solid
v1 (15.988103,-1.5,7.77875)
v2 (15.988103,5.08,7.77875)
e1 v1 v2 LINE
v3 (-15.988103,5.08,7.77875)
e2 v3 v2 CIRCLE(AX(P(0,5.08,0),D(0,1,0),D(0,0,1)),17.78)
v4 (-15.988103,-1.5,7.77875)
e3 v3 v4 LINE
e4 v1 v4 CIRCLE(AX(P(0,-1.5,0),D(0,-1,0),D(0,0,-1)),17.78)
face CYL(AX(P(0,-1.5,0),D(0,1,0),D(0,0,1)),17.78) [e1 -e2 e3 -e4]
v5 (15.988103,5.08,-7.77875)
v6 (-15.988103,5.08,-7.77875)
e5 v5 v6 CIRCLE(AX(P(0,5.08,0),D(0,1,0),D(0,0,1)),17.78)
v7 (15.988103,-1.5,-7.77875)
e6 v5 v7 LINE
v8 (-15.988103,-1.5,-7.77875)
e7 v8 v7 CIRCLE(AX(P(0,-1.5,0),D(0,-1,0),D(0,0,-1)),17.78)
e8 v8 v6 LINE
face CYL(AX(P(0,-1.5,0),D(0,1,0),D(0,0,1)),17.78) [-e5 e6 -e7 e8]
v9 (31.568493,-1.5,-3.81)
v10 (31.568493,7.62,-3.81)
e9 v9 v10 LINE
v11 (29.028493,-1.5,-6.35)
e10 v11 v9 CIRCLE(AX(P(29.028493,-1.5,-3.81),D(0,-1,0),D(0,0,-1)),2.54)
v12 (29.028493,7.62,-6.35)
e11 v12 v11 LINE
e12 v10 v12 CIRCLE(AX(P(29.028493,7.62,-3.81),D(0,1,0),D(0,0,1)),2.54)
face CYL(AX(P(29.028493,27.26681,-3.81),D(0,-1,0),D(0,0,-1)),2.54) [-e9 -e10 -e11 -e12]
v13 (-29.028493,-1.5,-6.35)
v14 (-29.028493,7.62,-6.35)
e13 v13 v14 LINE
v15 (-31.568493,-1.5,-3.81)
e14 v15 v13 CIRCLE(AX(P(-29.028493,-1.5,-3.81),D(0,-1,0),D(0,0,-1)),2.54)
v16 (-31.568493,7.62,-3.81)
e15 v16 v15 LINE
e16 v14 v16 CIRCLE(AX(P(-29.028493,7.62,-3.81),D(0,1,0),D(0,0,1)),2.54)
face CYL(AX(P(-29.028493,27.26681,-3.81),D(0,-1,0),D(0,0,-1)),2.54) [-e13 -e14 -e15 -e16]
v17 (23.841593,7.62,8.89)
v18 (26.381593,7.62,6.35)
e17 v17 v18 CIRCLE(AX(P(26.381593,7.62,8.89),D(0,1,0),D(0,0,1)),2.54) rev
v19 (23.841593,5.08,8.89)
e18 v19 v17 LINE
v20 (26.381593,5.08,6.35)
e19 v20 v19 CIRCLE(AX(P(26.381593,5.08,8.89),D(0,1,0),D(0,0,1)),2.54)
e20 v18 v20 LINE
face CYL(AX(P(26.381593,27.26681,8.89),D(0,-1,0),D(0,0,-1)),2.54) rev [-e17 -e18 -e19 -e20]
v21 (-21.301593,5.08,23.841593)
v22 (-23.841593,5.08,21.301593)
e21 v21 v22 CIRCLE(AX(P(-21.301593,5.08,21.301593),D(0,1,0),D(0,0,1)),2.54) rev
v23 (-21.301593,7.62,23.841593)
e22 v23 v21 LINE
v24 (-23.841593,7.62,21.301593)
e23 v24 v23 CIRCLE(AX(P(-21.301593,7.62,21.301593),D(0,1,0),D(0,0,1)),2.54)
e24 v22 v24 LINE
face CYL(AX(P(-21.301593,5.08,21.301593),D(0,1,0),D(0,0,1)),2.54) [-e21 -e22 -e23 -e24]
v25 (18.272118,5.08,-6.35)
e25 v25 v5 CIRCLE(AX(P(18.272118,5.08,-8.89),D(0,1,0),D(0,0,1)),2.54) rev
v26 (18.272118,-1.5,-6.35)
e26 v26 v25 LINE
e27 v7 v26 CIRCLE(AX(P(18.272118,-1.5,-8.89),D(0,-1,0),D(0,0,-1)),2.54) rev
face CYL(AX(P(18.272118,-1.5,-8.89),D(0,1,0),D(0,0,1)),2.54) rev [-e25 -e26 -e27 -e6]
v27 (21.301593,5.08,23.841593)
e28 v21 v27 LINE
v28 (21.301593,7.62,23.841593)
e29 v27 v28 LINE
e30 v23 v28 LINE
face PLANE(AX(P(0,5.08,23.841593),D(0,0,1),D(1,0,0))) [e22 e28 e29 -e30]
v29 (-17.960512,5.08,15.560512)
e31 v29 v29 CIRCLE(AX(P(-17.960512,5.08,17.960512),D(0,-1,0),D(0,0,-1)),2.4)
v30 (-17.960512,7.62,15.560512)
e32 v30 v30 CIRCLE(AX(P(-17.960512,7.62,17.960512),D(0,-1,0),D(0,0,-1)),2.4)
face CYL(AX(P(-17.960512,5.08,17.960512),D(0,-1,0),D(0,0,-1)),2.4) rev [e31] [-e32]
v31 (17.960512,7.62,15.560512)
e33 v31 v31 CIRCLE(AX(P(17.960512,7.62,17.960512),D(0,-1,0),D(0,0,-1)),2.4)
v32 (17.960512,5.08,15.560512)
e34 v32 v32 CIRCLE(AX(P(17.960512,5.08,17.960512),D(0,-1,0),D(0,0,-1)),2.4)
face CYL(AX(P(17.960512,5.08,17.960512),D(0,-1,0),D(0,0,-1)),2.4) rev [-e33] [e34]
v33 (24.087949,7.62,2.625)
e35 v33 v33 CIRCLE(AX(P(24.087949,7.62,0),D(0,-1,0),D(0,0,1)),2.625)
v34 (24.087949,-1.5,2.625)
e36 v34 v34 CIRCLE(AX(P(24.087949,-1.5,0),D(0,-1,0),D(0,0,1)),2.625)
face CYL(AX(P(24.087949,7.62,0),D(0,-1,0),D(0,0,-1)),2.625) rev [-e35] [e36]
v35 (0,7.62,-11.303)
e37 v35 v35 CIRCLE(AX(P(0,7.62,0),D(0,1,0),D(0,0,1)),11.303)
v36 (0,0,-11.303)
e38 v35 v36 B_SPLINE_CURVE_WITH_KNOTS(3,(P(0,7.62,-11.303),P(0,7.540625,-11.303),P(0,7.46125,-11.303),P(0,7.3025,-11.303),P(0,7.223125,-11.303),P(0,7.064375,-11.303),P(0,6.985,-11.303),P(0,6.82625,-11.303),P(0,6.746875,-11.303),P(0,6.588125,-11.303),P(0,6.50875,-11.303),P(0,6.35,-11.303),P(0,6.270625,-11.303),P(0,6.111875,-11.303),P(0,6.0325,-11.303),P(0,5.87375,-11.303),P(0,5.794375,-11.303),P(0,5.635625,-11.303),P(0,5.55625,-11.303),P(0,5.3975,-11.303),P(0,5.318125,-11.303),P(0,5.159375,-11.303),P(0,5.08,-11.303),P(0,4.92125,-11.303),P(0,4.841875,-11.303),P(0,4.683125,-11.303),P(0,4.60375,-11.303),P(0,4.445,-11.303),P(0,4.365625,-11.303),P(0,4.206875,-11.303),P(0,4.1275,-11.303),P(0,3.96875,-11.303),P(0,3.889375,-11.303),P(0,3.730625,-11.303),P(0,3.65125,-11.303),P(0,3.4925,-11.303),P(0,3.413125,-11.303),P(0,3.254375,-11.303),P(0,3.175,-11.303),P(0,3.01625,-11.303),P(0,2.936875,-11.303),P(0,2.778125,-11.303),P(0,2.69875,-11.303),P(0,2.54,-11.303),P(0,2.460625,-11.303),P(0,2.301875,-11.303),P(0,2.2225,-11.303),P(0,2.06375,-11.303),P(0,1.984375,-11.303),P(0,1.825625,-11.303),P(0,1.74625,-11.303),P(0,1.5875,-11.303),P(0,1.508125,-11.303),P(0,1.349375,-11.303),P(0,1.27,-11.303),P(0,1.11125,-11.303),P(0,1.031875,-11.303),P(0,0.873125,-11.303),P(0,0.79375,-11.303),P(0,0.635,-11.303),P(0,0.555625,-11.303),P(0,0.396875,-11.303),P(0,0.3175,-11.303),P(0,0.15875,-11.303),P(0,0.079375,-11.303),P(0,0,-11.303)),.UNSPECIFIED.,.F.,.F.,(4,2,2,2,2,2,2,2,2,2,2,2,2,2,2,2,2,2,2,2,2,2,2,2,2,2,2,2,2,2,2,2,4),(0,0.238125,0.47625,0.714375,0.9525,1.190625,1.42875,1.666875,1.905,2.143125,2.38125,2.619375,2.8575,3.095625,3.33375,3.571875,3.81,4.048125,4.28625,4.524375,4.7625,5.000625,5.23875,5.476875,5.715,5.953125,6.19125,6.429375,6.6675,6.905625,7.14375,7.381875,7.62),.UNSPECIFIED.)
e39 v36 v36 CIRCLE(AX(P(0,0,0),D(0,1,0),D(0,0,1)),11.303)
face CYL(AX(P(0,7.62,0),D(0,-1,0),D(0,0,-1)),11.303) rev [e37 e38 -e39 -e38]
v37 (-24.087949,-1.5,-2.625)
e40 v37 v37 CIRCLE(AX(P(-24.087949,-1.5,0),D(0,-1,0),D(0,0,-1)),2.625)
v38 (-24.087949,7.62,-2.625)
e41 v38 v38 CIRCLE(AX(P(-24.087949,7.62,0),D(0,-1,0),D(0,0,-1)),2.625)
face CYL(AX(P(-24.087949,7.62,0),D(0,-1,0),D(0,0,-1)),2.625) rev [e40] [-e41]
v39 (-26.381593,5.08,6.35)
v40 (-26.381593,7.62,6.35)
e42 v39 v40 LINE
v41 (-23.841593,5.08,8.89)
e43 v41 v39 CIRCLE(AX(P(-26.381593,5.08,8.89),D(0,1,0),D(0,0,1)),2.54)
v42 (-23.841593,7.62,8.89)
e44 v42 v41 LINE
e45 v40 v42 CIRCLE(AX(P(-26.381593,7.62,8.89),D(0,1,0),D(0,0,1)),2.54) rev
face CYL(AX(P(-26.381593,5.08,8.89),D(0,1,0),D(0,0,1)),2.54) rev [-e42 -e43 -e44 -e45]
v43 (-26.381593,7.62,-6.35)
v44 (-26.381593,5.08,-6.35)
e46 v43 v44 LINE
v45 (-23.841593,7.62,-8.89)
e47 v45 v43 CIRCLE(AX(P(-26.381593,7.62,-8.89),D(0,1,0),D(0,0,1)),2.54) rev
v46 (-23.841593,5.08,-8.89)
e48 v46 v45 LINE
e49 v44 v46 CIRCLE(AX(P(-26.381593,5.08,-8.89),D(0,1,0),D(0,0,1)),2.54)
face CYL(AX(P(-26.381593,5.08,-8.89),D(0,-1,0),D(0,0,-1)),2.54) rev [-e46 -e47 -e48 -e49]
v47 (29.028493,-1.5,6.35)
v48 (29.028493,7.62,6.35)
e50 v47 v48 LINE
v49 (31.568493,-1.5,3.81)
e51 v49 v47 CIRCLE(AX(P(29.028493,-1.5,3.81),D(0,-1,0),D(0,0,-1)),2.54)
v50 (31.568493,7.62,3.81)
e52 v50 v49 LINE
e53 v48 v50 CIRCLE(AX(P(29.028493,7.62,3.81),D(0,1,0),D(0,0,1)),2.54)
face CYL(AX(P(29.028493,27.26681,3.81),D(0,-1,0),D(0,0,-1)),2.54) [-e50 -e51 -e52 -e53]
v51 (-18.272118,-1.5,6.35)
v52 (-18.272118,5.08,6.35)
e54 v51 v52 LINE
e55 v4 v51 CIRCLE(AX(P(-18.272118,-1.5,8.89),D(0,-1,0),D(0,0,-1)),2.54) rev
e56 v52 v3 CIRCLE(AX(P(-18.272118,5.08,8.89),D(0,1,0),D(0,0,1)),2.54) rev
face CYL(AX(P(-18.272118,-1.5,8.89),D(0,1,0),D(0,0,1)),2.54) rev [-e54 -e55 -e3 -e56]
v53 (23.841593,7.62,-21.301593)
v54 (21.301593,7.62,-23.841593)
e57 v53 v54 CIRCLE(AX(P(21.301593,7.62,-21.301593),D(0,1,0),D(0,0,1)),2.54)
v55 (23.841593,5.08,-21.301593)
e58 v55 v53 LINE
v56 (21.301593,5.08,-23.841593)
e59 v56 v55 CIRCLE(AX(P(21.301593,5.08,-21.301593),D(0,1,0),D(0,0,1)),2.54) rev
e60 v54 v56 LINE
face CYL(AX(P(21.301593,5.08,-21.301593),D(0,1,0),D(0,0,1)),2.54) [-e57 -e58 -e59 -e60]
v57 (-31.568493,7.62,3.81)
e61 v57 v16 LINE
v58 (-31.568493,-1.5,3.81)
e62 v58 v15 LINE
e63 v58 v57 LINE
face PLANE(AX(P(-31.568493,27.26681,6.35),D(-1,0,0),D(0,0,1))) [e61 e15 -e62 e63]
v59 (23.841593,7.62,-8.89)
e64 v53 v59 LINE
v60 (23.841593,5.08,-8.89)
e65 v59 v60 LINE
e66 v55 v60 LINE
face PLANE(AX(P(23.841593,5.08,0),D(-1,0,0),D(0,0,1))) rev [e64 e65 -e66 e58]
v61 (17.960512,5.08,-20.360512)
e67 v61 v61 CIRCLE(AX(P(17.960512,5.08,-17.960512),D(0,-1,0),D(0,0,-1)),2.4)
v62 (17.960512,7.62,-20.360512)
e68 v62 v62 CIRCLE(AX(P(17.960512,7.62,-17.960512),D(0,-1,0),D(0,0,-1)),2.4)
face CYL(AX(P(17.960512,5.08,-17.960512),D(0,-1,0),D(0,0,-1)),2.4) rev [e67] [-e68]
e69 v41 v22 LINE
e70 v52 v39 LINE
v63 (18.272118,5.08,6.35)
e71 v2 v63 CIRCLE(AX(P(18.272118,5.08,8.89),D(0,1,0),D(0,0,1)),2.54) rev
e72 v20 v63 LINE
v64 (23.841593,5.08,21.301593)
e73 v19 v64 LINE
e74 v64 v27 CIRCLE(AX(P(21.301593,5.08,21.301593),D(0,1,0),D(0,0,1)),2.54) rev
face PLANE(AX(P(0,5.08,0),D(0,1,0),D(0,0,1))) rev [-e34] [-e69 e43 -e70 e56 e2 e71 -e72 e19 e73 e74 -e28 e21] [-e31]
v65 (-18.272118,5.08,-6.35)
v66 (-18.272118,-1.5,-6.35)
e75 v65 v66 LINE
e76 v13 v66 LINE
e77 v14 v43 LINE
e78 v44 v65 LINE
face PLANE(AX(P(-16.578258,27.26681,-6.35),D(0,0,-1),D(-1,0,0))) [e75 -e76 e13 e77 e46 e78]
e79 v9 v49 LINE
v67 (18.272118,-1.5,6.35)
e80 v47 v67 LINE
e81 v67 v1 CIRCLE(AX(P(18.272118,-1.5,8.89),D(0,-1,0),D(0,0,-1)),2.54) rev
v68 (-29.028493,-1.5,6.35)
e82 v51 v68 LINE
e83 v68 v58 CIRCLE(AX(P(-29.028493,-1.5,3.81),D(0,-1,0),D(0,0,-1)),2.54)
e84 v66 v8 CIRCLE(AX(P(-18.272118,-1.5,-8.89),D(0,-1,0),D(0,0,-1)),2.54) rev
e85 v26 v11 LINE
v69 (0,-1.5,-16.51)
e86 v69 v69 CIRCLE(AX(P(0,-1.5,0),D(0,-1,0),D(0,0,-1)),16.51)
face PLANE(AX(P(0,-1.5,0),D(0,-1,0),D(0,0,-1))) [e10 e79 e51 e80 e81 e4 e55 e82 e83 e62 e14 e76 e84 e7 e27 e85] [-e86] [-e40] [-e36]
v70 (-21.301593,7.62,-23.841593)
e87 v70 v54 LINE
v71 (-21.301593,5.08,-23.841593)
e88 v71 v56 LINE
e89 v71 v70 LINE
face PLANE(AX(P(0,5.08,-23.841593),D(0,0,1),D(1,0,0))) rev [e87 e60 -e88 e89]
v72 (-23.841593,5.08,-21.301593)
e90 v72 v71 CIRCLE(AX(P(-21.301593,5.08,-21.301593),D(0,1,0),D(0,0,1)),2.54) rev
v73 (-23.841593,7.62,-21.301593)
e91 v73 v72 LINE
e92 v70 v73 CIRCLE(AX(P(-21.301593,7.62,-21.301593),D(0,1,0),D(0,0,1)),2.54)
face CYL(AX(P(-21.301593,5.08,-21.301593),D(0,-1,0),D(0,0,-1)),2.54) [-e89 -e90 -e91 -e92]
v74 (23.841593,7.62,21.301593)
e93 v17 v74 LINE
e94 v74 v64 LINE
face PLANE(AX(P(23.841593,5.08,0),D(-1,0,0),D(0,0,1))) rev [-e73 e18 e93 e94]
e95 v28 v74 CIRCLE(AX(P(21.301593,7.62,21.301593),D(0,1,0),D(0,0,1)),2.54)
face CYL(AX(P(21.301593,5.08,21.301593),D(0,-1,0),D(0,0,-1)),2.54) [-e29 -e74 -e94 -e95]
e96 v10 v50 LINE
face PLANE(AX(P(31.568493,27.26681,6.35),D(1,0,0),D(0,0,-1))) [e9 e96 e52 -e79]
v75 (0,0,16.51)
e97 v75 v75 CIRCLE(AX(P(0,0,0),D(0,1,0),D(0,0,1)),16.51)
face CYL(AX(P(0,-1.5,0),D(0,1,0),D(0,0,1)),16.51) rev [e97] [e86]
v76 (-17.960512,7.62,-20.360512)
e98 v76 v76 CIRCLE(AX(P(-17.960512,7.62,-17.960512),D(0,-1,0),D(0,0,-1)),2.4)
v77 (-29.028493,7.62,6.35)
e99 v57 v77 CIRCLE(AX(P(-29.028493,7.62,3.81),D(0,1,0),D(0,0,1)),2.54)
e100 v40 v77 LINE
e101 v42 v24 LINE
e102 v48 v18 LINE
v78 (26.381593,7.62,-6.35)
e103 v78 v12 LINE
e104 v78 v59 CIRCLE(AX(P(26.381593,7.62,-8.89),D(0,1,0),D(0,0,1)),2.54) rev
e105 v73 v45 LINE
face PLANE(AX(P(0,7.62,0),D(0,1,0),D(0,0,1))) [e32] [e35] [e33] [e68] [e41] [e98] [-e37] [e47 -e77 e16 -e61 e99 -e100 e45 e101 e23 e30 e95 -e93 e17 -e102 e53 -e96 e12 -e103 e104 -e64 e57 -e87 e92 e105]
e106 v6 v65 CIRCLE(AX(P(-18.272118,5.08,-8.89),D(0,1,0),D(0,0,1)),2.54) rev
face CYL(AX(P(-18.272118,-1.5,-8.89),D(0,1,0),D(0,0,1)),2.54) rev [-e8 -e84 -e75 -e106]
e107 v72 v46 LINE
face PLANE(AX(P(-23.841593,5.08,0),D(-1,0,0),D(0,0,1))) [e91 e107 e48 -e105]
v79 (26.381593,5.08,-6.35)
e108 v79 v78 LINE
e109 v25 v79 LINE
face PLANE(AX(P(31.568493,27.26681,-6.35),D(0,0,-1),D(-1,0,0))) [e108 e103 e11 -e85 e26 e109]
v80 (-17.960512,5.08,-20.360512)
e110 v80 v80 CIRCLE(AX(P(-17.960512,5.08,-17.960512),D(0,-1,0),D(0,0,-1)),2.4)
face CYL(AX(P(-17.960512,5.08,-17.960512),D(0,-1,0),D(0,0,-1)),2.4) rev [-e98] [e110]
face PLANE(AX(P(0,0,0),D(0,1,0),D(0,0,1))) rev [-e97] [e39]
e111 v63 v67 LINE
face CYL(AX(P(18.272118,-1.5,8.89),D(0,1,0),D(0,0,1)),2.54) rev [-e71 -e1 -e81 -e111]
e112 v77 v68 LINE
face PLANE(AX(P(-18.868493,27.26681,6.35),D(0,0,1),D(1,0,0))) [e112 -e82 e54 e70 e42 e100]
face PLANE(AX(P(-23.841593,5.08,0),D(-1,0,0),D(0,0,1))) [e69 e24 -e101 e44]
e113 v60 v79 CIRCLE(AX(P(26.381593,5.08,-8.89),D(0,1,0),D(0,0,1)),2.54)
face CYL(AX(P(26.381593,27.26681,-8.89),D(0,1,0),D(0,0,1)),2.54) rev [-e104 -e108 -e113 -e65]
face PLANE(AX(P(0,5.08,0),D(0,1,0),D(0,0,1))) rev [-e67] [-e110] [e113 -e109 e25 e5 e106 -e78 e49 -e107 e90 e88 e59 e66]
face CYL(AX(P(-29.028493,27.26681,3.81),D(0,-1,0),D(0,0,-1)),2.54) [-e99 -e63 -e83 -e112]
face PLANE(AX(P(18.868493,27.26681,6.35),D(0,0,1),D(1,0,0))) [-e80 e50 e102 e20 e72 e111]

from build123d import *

# Parameters (mm, degrees)
SKETCH1_R                     = 13.843
SKETCH1_R_2                   = 11.303
BOSS_EXTRUDE1_DEPTH           = 7.62
BOSS_EXTRUDE4_DEPTH           = 1.5
BOSS_EXTRUDE4_DEPTH_BACK      = 7.62
SKETCH6_R                     = 17.78
SKETCH6_R_2                   = 16.51
BOSS_EXTRUDE5_DEPTH           = 9.12
BOSS_EXTRUDE6_START           = -2.54
BOSS_EXTRUDE6_OUTLINE_W       = 47.683186112
BOSS_EXTRUDE6_OUTLINE_H       = 47.683186112
BOSS_EXTRUDE6_OUTLINE_R       = 0.801080814
BOSS_EXTRUDE6_OUTLINE_R_2     = 13.843
BOSS_EXTRUDE6_DEPTH           = 2.54
SKETCH11_W                    = 2.4
SKETCH11_H                    = 2.54
M4_CLEARANCE_HOLE2_AT_2_COUNT = 2
M4_CLEARANCE_HOLE2_AT_2_PITCH = 35.921024484
M4_CLEARANCE_HOLE2_AT_3_COUNT = 2
M4_CLEARANCE_HOLE2_AT_3_PITCH = 50.8
M4_CLEARANCE_HOLE2_AT_4_COUNT = 2
M4_CLEARANCE_HOLE2_AT_4_PITCH = 35.921024484
FILLET1_R                     = 2.54
BOSS_EXTRUDE7_START           = 5.08
SKETCH12_R                    = 16.51
SKETCH12_R_2                  = 13.843
BOSS_EXTRUDE7_DEPTH           = 5.08
SKETCH8_R                     = 2.625
CUT_EXTRUDE2_DEPTH            = 41.597607221
FILLET2_R                     = 2.54


# Read off the part's stored shape, not the designer's step: Boss-Extrude6
with BuildPart() as part:
    # Sketch1 → Boss-Extrude1 (new body)
    with BuildSketch(Plane(origin=(0, 0, 0), x_dir=(1, 0, 0), z_dir=(0, 1, 0))):
        with Locations(Location((0, 0, 0), (0, 0, 90))):
            Circle(SKETCH1_R)
        with Locations(Location((0, 0, 0), (0, 0, 90))):
            Circle(SKETCH1_R_2, mode=Mode.SUBTRACT)
    extrude(amount=BOSS_EXTRUDE1_DEPTH)

    # Boss-Extrude6 outline → Boss-Extrude6 (add)
    with BuildSketch(Plane(origin=(0, 7.62, 0), x_dir=(1, 0, 0), z_dir=(0, 1, 0)).offset(BOSS_EXTRUDE6_START)):
        Rectangle(BOSS_EXTRUDE6_OUTLINE_W, BOSS_EXTRUDE6_OUTLINE_H)
        with Locations((-17.960512242, -17.960512242)):
            Circle(BOSS_EXTRUDE6_OUTLINE_R, mode=Mode.SUBTRACT)
        with Locations((17.960512242, -17.960512242)):
            Circle(BOSS_EXTRUDE6_OUTLINE_R, mode=Mode.SUBTRACT)
        with Locations((-17.960512242, 17.960512242)):
            Circle(BOSS_EXTRUDE6_OUTLINE_R, mode=Mode.SUBTRACT)
        Circle(BOSS_EXTRUDE6_OUTLINE_R_2, mode=Mode.SUBTRACT)
        with Locations((17.960512242, 17.960512242)):
            Circle(BOSS_EXTRUDE6_OUTLINE_R, mode=Mode.SUBTRACT)
    extrude(amount=BOSS_EXTRUDE6_DEPTH)

    # Sketch11 → M4 Clearance Hole2 (revolve, cut)
    with BuildSketch(Plane(origin=(17.960512242, 5.08, -17.960512242), x_dir=(0, 0, -1), z_dir=(1, 0, 0))):
        with Locations((1.2, 1.27)):
            Rectangle(SKETCH11_W, SKETCH11_H)
    m4_clearance_hole2 = revolve(axis=Axis((17.960512242, -1.27, -17.960512242), (0, 1, 0)), mode=Mode.SUBTRACT)

    # M4 Clearance Hole2 at 2: M4 Clearance Hole2 ×2
    with Locations(*[(-i * M4_CLEARANCE_HOLE2_AT_2_PITCH, 0, 0) for i in range(1, M4_CLEARANCE_HOLE2_AT_2_COUNT)]):
        add(m4_clearance_hole2, mode=Mode.SUBTRACT)

    # M4 Clearance Hole2 at 3: M4 Clearance Hole2 ×2
    with Locations(*[Vector(-0.7071067811865477, 0, 0.7071067811865475) * (i * M4_CLEARANCE_HOLE2_AT_3_PITCH) for i in range(1, M4_CLEARANCE_HOLE2_AT_3_COUNT)]):
        add(m4_clearance_hole2, mode=Mode.SUBTRACT)

    # M4 Clearance Hole2 at 4: M4 Clearance Hole2 ×2
    with Locations(*[(0, 0, i * M4_CLEARANCE_HOLE2_AT_4_PITCH) for i in range(1, M4_CLEARANCE_HOLE2_AT_4_COUNT)]):
        add(m4_clearance_hole2, mode=Mode.SUBTRACT)

    # Fillet1
    fillet1_edges = [part.edges().sort_by_distance(p)[0] for p in [
        (23.841593056, 6.35, -23.841593056),
        (23.841593056, 6.35, 23.841593056),
        (-23.841593056, 6.35, 23.841593056),
        (-23.841593056, 6.35, -23.841593056),
    ]]
    fillet(fillet1_edges, radius=FILLET1_R)



with BuildPart() as body_2:
    # Sketch6 → Boss-Extrude4 (new, two sides: drawn at the far end of the back side and taken through both)
    with BuildSketch(Plane.XZ.offset(-BOSS_EXTRUDE4_DEPTH_BACK)):
        with Locations(Location((0, 0, 0), (0, 0, 90))):
            Circle(SKETCH6_R)
        with Locations(Location((0, 0, 0), (0, 0, 90))):
            Circle(SKETCH6_R_2, mode=Mode.SUBTRACT)
    extrude(amount=BOSS_EXTRUDE4_DEPTH + BOSS_EXTRUDE4_DEPTH_BACK)

    # Sketch7 → Boss-Extrude5 (add)
    with BuildSketch(Plane.XZ.offset(1.5)):
        Polygon((-18.868493037, 6.35), (-31.568493037, 6.35), (-31.568493037, -6.35), (-18.868493037, -6.35), (-16.578258023, -6.35), (-16.578258023, 6.35), align=None)
        Polygon((18.868493037, 6.35), (16.578258023, 6.35), (16.578258023, -6.35), (18.868493037, -6.35), (31.568493037, -6.35), (31.568493037, 6.35), align=None)
    extrude(amount=-BOSS_EXTRUDE5_DEPTH)


with BuildPart() as part_1:
    add(part.part)

    add(body_2.part)  # Boss-Extrude7 merges body 2
    # Sketch12 → Boss-Extrude7 (add)
    with BuildSketch(Plane.XZ.offset(-5.08).offset(BOSS_EXTRUDE7_START)):
        with Locations(Location((0, 0, 0), (0, 0, 90))):
            Circle(SKETCH12_R)
        Circle(SKETCH12_R_2, mode=Mode.SUBTRACT)
    extrude(amount=-BOSS_EXTRUDE7_DEPTH)

    # Sketch8 → Cut-Extrude2 (cut, through all)
    with BuildSketch(Plane.XZ.offset(1.5)):
        with Locations(Location((-24.087949006, 0, 0), (0, 0, 270))):
            Circle(SKETCH8_R)
        with Locations(Location((24.087949006, 0, 0), (0, 0, 90))):
            Circle(SKETCH8_R)
    extrude(amount=-CUT_EXTRUDE2_DEPTH, mode=Mode.SUBTRACT)

    # Fillet2
    fillet2_edges = [part_1.edges().sort_by_distance(p)[0] for p in [
        (-31.568493037, 3.06, 6.35),
        (-31.568493037, 3.06, -6.35),
        (-16.607404975, 1.79, -6.35),
        (31.568493037, 3.06, -6.35),
        (16.607404975, 1.79, 6.35),
        (31.568493037, 3.06, 6.35),
        (16.607404975, 1.79, -6.35),
        (23.841593056, 6.35, -6.35),
        (-23.841593056, 6.35, -6.35),
        (-16.607404975, 1.79, 6.35),
        (-23.841593056, 6.35, 6.35),
        (23.841593056, 6.35, 6.35),
    ]]
    fillet(fillet2_edges, radius=FILLET2_R)


solid = part_1.part
